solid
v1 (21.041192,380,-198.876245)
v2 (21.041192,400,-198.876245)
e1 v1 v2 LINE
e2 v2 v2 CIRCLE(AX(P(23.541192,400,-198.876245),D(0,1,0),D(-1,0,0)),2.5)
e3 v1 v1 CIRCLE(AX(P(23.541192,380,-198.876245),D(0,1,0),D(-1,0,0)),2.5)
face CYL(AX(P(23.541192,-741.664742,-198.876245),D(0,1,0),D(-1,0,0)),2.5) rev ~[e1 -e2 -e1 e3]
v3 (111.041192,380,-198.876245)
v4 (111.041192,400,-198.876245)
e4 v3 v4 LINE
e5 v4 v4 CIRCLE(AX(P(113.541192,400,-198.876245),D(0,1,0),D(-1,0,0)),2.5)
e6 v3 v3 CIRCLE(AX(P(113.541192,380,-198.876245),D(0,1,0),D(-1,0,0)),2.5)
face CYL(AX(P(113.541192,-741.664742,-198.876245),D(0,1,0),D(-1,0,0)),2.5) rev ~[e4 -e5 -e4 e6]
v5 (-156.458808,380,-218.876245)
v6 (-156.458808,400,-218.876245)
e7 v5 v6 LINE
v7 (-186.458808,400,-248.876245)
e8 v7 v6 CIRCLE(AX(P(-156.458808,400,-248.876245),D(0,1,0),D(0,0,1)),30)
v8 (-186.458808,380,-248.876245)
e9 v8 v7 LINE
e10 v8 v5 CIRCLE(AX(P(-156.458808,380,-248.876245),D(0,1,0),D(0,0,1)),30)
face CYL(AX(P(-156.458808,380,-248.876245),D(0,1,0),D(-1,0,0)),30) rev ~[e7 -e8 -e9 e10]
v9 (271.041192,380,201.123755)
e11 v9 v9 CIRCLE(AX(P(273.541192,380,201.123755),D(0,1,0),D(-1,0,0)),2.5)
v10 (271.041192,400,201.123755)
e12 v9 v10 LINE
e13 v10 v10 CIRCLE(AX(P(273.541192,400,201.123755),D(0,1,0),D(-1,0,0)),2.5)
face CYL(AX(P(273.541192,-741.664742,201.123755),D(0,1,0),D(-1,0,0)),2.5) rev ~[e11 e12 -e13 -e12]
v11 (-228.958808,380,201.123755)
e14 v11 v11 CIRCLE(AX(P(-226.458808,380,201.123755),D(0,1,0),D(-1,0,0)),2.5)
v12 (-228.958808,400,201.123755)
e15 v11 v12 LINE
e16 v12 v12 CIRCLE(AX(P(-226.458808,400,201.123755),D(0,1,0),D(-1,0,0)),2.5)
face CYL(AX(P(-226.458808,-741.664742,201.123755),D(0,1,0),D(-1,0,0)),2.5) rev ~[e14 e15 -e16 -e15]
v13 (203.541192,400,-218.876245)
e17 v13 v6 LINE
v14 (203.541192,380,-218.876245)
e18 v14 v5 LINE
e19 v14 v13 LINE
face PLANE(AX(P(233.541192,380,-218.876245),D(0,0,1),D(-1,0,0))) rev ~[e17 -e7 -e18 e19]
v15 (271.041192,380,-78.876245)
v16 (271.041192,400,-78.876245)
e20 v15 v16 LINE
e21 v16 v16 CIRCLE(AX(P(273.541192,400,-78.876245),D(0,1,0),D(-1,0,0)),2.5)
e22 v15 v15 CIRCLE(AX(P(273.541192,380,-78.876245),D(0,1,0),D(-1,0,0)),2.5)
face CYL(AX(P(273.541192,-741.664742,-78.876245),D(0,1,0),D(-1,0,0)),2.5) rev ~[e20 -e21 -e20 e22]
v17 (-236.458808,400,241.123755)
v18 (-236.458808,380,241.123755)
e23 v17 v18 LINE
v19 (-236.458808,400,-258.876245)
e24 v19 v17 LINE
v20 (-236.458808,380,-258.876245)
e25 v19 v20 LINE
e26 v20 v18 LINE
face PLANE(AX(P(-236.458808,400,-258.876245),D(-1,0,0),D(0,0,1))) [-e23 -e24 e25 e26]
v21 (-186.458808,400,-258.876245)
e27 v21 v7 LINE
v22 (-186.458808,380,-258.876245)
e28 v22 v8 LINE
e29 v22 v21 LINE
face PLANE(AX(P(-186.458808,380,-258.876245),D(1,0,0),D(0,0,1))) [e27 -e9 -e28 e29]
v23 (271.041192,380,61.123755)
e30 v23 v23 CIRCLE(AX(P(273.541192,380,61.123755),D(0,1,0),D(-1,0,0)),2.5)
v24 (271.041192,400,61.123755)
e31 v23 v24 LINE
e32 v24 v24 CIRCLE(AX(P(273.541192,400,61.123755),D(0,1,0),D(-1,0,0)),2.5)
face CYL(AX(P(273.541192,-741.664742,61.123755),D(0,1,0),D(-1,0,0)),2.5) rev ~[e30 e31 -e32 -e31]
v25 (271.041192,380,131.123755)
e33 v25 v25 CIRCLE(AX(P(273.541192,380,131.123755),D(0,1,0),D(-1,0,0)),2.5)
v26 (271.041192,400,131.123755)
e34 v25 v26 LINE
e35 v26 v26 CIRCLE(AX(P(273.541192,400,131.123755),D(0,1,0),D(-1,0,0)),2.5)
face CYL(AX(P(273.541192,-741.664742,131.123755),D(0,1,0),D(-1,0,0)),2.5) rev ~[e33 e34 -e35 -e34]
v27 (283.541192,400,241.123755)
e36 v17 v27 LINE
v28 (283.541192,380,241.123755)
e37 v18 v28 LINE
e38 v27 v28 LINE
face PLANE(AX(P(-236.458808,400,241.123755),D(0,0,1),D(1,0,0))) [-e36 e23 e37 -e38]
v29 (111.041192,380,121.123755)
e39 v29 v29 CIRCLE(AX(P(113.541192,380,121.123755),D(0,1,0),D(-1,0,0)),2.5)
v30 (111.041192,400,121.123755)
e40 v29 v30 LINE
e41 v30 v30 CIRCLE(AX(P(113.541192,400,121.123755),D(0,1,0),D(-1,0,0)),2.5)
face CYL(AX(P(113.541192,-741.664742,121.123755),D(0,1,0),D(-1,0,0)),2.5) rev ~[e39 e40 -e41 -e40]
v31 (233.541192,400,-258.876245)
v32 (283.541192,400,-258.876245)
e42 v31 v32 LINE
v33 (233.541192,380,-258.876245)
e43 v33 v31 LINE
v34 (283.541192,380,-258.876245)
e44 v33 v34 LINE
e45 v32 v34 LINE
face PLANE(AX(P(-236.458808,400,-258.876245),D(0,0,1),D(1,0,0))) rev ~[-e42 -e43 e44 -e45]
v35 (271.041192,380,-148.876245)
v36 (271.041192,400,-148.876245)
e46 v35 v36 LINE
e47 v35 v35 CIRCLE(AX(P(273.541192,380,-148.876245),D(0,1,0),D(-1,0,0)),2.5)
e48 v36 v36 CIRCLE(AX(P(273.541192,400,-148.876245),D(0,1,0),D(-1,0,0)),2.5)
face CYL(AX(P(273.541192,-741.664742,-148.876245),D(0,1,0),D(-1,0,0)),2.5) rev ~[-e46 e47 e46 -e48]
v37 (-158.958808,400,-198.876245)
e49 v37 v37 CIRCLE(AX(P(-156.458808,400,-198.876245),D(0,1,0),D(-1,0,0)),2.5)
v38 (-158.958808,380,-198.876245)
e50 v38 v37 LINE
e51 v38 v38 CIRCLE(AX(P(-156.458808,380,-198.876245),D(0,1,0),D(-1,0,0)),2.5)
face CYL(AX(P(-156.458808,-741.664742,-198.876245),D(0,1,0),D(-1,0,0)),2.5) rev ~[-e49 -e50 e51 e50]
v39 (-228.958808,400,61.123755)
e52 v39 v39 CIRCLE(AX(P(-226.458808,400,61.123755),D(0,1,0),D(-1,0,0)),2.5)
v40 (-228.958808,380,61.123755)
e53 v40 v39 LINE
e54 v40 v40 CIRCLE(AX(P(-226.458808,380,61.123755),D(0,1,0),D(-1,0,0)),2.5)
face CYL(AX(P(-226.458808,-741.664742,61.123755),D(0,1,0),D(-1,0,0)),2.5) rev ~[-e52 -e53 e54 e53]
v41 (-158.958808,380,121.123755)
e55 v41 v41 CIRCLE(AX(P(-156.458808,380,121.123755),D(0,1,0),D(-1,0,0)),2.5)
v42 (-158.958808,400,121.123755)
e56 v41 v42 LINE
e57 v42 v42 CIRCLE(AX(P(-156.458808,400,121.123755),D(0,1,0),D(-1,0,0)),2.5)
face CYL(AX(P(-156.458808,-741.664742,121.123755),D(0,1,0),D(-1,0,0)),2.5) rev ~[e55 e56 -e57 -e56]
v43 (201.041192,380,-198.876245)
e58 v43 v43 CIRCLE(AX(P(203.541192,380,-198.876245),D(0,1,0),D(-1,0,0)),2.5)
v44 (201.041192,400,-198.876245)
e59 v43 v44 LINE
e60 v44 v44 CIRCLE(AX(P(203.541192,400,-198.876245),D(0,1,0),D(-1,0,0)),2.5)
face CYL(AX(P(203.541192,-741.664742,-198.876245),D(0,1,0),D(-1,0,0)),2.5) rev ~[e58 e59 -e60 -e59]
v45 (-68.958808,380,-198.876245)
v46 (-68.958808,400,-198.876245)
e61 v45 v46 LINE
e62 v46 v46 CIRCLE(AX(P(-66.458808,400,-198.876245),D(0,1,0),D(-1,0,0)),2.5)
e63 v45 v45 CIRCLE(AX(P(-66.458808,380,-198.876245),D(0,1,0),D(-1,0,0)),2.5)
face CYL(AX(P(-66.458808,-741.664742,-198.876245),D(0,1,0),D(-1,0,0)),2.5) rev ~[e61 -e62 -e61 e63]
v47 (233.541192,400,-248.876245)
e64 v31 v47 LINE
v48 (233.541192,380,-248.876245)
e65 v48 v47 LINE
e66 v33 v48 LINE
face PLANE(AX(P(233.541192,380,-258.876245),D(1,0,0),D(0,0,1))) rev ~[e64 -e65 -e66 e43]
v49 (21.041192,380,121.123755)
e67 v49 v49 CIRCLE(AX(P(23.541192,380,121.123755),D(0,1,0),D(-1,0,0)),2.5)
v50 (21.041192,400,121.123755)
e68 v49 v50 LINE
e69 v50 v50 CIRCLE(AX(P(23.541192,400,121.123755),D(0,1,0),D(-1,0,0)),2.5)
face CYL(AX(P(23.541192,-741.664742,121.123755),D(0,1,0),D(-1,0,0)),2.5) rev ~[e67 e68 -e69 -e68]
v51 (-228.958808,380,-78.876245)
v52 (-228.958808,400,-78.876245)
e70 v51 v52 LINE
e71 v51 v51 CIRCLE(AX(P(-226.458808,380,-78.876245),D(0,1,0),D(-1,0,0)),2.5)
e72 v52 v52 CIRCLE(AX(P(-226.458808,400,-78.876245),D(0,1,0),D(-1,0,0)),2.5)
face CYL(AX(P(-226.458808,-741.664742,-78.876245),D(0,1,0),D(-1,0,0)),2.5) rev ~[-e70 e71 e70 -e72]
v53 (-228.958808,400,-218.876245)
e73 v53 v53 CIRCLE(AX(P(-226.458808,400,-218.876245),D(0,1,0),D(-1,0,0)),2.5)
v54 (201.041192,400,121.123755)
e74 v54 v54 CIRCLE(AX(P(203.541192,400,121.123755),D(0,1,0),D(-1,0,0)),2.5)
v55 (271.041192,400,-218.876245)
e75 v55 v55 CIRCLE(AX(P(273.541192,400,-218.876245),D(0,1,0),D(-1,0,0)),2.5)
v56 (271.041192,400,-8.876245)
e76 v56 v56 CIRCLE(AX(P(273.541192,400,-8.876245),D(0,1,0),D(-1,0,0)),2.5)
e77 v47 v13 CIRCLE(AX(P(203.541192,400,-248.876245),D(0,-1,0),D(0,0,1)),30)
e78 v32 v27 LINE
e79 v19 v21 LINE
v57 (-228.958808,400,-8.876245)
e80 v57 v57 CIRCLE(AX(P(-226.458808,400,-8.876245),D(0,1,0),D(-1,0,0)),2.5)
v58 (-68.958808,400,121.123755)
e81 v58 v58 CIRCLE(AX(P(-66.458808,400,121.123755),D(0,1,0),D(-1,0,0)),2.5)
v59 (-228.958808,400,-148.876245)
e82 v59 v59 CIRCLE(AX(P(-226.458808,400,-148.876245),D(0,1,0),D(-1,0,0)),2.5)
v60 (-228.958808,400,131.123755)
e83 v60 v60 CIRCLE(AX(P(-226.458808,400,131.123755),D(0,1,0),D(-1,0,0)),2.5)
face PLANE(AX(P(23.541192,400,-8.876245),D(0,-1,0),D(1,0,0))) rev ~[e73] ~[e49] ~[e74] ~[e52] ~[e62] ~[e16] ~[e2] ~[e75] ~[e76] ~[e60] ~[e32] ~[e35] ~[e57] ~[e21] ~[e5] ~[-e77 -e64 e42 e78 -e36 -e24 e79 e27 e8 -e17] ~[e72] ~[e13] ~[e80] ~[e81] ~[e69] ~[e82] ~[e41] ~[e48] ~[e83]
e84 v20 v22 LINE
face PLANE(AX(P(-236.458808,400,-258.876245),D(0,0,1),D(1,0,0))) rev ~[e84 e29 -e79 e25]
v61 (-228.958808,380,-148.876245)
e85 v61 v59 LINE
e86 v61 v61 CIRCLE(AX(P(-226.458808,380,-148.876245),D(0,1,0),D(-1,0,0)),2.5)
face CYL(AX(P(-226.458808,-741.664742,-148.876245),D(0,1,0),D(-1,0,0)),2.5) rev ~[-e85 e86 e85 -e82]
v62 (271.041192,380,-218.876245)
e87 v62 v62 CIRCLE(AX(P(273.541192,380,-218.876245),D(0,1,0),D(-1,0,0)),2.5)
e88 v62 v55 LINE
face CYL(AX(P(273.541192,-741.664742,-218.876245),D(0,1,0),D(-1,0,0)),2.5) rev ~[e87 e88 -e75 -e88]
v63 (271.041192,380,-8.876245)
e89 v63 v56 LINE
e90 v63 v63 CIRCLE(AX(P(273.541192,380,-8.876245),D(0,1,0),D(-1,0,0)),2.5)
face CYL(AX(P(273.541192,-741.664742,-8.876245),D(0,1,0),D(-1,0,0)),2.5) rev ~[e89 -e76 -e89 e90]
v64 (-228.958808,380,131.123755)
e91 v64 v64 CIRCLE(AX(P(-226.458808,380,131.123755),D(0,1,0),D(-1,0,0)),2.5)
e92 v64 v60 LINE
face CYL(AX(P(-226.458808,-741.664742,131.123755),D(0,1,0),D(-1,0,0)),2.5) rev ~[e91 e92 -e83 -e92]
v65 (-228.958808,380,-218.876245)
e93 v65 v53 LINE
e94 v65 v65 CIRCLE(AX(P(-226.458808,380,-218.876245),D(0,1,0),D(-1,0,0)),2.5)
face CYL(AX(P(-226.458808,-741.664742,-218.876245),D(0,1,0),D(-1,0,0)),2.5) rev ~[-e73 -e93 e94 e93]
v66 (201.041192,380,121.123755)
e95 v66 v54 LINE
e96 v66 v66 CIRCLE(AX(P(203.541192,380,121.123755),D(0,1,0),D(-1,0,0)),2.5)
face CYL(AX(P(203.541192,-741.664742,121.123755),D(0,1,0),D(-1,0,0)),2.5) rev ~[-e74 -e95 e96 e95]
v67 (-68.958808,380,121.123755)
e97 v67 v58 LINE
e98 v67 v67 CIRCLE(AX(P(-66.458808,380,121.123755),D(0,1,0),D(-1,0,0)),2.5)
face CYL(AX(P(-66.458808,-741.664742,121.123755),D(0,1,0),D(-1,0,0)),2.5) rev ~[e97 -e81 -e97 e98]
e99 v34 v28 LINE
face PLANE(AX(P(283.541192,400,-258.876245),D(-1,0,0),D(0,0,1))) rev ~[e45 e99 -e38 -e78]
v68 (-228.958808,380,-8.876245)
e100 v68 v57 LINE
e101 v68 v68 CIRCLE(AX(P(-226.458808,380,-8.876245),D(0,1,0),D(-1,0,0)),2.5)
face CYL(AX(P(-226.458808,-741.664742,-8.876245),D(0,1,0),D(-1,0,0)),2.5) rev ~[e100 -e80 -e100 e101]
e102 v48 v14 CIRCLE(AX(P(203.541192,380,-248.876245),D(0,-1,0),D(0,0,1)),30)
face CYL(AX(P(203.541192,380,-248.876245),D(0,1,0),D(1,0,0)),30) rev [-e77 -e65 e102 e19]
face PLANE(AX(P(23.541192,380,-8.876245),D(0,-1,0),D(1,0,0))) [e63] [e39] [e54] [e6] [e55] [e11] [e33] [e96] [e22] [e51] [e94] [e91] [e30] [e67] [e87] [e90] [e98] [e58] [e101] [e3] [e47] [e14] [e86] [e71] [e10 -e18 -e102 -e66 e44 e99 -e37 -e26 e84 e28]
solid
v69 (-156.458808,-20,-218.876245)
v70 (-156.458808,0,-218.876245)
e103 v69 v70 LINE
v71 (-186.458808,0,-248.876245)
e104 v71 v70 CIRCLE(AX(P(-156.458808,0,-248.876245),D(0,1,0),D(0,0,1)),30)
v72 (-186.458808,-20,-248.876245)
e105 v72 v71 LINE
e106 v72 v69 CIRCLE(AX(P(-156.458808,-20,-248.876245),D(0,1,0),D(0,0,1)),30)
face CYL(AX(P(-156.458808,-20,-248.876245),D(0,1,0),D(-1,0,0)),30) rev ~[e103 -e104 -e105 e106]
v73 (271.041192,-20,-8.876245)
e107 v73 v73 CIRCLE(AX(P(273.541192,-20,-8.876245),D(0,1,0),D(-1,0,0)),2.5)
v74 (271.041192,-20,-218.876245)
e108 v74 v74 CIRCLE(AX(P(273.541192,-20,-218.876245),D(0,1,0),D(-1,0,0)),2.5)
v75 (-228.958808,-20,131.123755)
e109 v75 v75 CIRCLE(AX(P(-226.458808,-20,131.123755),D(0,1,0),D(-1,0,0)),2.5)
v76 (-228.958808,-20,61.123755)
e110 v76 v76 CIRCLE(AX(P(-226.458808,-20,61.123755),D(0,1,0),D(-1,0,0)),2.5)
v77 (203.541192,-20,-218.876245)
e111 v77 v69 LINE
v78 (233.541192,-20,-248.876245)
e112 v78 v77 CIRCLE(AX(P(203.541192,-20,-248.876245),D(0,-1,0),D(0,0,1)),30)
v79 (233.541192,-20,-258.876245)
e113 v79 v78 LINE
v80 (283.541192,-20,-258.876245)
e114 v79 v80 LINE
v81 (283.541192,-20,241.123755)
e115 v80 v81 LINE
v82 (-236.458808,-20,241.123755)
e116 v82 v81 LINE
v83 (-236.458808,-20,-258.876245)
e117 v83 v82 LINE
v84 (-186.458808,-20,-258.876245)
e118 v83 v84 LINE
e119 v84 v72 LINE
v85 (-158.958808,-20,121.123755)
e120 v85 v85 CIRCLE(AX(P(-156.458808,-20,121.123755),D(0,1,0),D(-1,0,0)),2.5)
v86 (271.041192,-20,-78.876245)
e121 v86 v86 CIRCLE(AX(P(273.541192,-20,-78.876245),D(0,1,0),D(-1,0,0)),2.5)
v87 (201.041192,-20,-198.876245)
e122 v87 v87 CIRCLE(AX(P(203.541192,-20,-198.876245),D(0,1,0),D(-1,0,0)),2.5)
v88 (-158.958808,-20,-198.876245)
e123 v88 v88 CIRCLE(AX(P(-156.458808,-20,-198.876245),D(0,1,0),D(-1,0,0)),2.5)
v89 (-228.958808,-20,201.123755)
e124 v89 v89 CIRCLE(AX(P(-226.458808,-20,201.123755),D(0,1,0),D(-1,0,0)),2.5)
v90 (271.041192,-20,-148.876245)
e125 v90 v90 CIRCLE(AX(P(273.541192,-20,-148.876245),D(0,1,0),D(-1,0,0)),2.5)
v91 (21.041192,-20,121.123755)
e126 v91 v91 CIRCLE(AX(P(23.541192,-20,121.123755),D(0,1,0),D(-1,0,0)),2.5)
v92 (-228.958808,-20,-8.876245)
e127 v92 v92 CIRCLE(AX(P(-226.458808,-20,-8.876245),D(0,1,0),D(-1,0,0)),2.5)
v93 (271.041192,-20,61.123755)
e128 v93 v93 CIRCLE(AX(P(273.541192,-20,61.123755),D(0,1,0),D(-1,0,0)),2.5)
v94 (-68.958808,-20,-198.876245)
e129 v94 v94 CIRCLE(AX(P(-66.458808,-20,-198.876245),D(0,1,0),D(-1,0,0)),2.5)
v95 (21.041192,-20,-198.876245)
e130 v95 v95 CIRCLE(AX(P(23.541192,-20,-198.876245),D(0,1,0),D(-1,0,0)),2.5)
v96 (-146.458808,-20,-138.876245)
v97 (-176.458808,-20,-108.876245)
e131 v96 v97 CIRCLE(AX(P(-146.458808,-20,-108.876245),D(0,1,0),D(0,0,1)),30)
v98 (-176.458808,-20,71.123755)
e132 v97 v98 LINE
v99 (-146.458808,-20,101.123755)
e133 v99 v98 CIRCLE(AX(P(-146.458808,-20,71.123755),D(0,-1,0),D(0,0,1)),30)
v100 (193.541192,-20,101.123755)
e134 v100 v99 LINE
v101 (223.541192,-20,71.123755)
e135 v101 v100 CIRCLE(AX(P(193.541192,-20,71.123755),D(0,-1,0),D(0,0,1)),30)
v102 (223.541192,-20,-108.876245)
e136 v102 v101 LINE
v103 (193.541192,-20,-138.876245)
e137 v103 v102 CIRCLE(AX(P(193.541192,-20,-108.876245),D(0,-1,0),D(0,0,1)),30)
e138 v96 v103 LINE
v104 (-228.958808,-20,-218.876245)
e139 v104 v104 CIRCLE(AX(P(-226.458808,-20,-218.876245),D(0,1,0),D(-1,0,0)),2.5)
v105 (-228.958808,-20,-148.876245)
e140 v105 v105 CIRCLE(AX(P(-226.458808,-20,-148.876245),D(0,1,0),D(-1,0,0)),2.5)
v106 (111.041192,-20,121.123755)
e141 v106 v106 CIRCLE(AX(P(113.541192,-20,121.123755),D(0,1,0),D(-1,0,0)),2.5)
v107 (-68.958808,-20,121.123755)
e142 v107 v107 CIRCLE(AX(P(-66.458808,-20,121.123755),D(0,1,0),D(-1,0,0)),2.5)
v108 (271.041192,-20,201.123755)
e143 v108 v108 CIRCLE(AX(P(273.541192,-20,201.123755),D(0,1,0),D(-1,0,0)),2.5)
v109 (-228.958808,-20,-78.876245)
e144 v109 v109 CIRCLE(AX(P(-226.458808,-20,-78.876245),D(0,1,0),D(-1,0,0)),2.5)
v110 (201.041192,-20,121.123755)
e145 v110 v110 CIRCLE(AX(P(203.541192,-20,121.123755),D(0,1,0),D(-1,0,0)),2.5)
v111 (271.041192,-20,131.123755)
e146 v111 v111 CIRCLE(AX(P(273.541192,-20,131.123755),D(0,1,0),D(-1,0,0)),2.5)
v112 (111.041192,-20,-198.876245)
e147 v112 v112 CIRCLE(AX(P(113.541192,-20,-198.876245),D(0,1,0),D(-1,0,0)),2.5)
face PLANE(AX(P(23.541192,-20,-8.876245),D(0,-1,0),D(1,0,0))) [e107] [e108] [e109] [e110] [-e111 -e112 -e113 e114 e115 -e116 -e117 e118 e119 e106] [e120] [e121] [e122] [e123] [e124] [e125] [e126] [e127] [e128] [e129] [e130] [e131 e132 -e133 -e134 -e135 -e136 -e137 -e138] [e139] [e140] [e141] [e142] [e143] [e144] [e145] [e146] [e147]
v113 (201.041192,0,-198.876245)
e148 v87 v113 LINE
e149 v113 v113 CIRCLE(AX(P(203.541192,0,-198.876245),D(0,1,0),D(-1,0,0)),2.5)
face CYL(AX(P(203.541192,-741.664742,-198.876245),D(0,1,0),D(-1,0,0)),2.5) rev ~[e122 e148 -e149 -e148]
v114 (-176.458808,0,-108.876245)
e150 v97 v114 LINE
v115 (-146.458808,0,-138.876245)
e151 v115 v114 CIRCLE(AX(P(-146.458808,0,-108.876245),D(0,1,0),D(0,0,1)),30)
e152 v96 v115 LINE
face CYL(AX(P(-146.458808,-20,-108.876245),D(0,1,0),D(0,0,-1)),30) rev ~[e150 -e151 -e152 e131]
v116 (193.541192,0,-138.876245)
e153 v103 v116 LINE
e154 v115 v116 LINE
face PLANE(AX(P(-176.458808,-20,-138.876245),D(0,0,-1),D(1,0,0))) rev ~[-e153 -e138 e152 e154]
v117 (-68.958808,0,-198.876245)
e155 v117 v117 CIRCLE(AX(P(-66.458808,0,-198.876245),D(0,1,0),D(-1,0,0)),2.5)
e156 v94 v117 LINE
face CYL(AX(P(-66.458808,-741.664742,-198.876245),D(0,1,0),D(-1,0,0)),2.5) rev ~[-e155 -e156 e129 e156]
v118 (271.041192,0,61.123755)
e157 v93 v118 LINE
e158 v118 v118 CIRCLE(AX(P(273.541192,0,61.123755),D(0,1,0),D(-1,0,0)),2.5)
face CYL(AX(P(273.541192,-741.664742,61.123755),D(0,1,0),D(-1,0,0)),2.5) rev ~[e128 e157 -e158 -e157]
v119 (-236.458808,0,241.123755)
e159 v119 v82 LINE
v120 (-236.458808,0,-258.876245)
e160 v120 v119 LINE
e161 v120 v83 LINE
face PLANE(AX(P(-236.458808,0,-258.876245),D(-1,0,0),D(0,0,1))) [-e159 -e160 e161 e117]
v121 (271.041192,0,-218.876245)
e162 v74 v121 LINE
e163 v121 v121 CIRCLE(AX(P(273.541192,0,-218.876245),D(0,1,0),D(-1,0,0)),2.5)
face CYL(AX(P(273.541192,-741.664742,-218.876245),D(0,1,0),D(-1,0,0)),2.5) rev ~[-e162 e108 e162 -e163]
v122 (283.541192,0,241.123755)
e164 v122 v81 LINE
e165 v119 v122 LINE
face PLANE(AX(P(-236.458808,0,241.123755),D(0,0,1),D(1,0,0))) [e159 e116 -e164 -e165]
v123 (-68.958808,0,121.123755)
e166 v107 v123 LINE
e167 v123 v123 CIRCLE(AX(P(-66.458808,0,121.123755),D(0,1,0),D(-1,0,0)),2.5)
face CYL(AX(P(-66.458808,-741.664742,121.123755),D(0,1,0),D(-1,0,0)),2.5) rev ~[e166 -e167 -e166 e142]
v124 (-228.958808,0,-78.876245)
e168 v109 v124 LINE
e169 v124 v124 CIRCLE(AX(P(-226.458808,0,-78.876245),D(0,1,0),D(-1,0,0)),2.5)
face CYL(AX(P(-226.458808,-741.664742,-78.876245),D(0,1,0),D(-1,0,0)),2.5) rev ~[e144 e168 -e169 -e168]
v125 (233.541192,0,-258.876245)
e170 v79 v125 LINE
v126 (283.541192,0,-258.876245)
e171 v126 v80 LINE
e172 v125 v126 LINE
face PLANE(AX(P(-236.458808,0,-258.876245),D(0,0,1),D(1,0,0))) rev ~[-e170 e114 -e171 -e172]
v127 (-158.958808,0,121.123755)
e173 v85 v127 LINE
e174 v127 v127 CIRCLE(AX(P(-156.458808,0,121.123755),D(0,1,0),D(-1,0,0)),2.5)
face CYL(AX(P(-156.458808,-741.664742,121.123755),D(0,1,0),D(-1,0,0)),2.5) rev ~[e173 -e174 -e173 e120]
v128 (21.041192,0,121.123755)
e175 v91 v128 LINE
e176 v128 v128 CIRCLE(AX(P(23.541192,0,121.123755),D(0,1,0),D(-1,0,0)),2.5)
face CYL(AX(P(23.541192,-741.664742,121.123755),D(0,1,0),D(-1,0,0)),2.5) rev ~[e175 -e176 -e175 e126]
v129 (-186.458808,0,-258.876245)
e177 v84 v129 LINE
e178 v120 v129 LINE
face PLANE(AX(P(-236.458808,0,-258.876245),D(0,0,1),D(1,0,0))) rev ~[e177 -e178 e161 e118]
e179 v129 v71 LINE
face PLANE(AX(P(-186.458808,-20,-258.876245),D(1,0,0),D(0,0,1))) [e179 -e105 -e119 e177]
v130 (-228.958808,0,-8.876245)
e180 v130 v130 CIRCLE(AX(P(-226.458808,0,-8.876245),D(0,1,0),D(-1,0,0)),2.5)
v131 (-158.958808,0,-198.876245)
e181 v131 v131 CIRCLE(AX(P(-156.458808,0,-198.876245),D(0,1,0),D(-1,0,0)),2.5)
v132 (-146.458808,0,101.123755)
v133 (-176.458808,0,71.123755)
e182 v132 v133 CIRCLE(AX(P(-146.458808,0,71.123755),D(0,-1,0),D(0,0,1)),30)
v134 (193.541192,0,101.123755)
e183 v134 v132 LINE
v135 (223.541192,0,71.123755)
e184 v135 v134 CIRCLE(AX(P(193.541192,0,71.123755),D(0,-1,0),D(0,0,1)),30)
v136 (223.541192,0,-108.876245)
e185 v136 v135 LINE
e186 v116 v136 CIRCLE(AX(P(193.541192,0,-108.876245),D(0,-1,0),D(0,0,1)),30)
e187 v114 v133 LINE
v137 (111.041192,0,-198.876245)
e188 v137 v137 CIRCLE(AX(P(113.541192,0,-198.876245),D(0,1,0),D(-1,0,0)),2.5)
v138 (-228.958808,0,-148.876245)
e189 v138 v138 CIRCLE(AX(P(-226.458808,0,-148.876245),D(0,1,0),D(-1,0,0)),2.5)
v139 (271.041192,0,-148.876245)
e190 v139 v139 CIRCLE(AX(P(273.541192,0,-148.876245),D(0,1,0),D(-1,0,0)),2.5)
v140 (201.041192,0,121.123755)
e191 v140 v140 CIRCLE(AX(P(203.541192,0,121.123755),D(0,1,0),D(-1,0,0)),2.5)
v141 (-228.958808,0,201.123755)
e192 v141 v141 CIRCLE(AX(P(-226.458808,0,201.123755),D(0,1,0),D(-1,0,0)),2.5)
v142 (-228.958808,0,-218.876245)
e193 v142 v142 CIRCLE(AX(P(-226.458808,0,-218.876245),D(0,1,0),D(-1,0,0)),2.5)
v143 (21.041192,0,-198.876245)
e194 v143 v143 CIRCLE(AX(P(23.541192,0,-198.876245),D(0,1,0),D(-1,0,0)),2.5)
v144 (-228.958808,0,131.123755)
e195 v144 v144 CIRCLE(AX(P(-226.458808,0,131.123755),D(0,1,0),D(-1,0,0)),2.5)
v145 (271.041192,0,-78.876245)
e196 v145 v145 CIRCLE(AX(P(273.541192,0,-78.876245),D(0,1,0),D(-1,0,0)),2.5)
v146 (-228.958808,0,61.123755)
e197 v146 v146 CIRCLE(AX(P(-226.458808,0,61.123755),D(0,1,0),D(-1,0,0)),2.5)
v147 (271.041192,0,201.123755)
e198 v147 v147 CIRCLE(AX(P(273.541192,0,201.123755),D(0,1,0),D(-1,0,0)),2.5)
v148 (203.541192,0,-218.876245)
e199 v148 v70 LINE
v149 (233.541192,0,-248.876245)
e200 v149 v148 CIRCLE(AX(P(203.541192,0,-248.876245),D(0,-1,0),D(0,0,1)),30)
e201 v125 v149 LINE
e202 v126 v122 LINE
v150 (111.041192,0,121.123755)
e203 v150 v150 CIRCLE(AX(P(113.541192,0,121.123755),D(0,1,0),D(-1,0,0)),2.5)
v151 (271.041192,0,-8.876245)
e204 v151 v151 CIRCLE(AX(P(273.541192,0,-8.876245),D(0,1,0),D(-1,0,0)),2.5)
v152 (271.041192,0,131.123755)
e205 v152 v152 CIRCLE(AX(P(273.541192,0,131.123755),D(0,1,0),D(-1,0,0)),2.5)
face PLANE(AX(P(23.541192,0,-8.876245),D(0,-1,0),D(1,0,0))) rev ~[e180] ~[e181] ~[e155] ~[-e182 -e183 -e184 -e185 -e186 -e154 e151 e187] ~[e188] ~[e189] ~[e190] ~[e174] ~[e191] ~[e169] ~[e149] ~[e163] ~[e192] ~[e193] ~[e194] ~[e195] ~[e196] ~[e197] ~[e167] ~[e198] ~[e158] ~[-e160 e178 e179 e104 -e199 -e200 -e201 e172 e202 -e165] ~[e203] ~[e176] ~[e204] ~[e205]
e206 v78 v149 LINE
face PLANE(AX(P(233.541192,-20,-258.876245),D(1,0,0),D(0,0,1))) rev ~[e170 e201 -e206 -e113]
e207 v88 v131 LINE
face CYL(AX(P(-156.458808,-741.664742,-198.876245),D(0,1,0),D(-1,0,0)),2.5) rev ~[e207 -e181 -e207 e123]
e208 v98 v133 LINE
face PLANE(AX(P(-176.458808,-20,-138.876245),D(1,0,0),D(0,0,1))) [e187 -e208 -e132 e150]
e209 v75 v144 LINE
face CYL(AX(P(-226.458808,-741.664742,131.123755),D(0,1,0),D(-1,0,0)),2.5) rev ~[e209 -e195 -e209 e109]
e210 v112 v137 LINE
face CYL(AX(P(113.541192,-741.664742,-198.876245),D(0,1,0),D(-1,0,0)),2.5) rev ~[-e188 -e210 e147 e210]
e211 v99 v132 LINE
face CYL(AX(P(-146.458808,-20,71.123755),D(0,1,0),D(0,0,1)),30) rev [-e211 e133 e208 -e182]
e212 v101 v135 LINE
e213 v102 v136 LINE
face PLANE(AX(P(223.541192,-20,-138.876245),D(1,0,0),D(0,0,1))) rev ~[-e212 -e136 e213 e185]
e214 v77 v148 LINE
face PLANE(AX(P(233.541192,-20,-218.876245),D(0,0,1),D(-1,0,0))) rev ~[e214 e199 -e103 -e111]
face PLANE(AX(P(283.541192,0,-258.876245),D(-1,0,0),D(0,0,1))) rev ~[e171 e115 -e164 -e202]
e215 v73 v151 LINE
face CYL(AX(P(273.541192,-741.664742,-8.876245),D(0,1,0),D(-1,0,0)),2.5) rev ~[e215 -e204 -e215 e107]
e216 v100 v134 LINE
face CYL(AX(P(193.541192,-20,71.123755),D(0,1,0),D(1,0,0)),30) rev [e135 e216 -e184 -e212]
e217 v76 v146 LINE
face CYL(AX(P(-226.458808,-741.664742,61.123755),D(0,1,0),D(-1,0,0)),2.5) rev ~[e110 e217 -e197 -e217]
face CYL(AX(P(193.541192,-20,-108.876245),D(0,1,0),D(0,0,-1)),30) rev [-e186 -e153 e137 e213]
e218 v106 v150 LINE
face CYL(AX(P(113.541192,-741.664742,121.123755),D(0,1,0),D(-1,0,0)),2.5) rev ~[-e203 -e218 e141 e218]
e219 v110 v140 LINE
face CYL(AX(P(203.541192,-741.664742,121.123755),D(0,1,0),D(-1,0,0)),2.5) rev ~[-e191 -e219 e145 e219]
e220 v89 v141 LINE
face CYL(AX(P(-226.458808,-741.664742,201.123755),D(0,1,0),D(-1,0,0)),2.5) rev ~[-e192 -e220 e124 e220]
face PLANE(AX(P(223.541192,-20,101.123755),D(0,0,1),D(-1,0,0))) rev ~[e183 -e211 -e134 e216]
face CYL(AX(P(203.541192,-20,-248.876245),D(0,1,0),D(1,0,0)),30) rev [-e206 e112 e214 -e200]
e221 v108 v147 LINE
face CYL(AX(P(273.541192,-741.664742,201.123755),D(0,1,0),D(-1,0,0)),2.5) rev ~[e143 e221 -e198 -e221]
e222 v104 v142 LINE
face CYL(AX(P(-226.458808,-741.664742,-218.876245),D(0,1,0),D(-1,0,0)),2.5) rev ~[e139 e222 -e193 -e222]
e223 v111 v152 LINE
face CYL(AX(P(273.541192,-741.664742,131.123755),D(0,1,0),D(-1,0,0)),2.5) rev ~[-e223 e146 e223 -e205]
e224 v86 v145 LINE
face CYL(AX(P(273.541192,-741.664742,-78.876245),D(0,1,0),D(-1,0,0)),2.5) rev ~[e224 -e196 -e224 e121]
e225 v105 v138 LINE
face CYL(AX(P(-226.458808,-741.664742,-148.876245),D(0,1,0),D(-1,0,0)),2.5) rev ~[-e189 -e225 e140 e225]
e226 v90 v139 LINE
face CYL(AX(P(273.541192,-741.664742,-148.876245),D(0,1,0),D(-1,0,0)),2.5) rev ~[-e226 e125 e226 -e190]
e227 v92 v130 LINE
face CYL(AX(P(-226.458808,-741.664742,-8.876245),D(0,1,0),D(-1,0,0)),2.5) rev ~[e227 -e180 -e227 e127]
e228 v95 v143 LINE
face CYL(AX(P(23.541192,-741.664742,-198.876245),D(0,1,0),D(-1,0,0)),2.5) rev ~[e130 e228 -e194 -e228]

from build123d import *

# Parameters (mm, degrees)
F0_W     = 520
F0_H     = 500
F1_DEPTH = 20
F2_W     = 210
F2_H     = 40
F3_DEPTH = 20
F4_R     = 30
F6_W     = 200
F6_H     = 240
F7_DEPTH = 20
F8_R     = 30
F10_D    = 5
F10_2_D  = 5
F12_D    = 5
F12_2_D  = 5


# Not quite as in the source:
# - a feature names something its author has since deleted; it is built from what else it names


with BuildPart() as f1:
    # F0 (on Front) → F1 (new body)
    with BuildSketch(Plane.XZ):
        with Locations((23.5411918163, -8.8762454689)):
            Rectangle(F0_W, F0_H)
    extrude(amount=F1_DEPTH)

    # F2 (on face) → F3 (cut, through all)
    with BuildSketch(Plane.XZ.offset(20)):
        with Locations((-81.4588081837, -238.8762454689)):
            Rectangle(F2_W, F2_H)
        with Locations((128.5411918163, -238.8762454689)):
            Rectangle(F2_W, F2_H)
    extrude(amount=-F3_DEPTH, mode=Mode.SUBTRACT)

    # F4
    f4_edges = [f1.edges().sort_by_distance(p)[0] for p in [
        (-186.458808, -10, -218.876245),
        (233.541192, -10, -218.876245),
    ]]
    fillet(f4_edges, radius=F4_R)


with BuildPart() as f5_1:
    # F5: copy of F1
    add(f1.part.moved(Location((0, 400, 0))))

    # F10#2 (through all)
    with Locations(Plane.XZ.offset(20)):
        with Locations((-226.4588081837, 201.1237545311), (-226.4588081837, 131.1237545311), (-226.4588081837, 61.1237545311), (-226.4588081837, -8.8762454689), (-226.4588081837, -78.8762454689), (-226.4588081837, -148.8762454689), (273.5411918163, -218.8762454689), (273.5411918163, -148.8762454689), (273.5411918163, -78.8762454689), (273.5411918163, -8.8762454689), (273.5411918163, 61.1237545311), (273.5411918163, 131.1237545311), (273.5411918163, 201.1237545311), (-226.4588081837, -218.8762454689)):
            Hole(F10_2_D / 2)

    # F12#2 (through all)
    with Locations(Plane.XZ.offset(20)):
        with Locations((-156.4588081837, 121.1237545311), (-66.4588081837, 121.1237545311), (23.5411918163, 121.1237545311), (113.5411918163, 121.1237545311), (203.5411918163, 121.1237545311), (203.5411918163, -198.8762454689), (113.5411918163, -198.8762454689), (23.5411918163, -198.8762454689), (-66.4588081837, -198.8762454689), (-156.4588081837, -198.8762454689)):
            Hole(F12_2_D / 2)


with BuildPart() as f1_1:
    add(f1.part)

    # F6 (on face) → F7 (cut, through all)
    with BuildSketch(Plane.XZ.offset(20)):
        with Locations((-76.4588081837, -18.8762454689)):
            Rectangle(F6_W, F6_H)
        with Locations((123.5411918163, -18.8762454689)):
            Rectangle(F6_W, F6_H)
    extrude(amount=-F7_DEPTH, mode=Mode.SUBTRACT)

    # F8
    f8_edges = [f1_1.edges().sort_by_distance(p)[0] for p in [
        (-176.458808, -10, 101.123755),
        (-176.458808, -10, -138.876245),
        (223.541192, -10, 101.123755),
        (223.541192, -10, -138.876245),
    ]]
    fillet(f8_edges, radius=F8_R)

    # F10 (through all)
    with Locations(Plane.XZ.offset(20)):
        with Locations((-226.4588081837, 201.1237545311), (-226.4588081837, 131.1237545311), (-226.4588081837, 61.1237545311), (-226.4588081837, -8.8762454689), (-226.4588081837, -78.8762454689), (-226.4588081837, -148.8762454689), (273.5411918163, -218.8762454689), (273.5411918163, -148.8762454689), (273.5411918163, -78.8762454689), (273.5411918163, -8.8762454689), (273.5411918163, 61.1237545311), (273.5411918163, 131.1237545311), (273.5411918163, 201.1237545311), (-226.4588081837, -218.8762454689)):
            Hole(F10_D / 2)

    # F12 (through all)
    with Locations(Plane.XZ.offset(20)):
        with Locations((-156.4588081837, 121.1237545311), (-66.4588081837, 121.1237545311), (23.5411918163, 121.1237545311), (113.5411918163, 121.1237545311), (203.5411918163, 121.1237545311), (203.5411918163, -198.8762454689), (113.5411918163, -198.8762454689), (23.5411918163, -198.8762454689), (-66.4588081837, -198.8762454689), (-156.4588081837, -198.8762454689)):
            Hole(F12_D / 2)


solid = Compound([f5_1.part, f1_1.part])
